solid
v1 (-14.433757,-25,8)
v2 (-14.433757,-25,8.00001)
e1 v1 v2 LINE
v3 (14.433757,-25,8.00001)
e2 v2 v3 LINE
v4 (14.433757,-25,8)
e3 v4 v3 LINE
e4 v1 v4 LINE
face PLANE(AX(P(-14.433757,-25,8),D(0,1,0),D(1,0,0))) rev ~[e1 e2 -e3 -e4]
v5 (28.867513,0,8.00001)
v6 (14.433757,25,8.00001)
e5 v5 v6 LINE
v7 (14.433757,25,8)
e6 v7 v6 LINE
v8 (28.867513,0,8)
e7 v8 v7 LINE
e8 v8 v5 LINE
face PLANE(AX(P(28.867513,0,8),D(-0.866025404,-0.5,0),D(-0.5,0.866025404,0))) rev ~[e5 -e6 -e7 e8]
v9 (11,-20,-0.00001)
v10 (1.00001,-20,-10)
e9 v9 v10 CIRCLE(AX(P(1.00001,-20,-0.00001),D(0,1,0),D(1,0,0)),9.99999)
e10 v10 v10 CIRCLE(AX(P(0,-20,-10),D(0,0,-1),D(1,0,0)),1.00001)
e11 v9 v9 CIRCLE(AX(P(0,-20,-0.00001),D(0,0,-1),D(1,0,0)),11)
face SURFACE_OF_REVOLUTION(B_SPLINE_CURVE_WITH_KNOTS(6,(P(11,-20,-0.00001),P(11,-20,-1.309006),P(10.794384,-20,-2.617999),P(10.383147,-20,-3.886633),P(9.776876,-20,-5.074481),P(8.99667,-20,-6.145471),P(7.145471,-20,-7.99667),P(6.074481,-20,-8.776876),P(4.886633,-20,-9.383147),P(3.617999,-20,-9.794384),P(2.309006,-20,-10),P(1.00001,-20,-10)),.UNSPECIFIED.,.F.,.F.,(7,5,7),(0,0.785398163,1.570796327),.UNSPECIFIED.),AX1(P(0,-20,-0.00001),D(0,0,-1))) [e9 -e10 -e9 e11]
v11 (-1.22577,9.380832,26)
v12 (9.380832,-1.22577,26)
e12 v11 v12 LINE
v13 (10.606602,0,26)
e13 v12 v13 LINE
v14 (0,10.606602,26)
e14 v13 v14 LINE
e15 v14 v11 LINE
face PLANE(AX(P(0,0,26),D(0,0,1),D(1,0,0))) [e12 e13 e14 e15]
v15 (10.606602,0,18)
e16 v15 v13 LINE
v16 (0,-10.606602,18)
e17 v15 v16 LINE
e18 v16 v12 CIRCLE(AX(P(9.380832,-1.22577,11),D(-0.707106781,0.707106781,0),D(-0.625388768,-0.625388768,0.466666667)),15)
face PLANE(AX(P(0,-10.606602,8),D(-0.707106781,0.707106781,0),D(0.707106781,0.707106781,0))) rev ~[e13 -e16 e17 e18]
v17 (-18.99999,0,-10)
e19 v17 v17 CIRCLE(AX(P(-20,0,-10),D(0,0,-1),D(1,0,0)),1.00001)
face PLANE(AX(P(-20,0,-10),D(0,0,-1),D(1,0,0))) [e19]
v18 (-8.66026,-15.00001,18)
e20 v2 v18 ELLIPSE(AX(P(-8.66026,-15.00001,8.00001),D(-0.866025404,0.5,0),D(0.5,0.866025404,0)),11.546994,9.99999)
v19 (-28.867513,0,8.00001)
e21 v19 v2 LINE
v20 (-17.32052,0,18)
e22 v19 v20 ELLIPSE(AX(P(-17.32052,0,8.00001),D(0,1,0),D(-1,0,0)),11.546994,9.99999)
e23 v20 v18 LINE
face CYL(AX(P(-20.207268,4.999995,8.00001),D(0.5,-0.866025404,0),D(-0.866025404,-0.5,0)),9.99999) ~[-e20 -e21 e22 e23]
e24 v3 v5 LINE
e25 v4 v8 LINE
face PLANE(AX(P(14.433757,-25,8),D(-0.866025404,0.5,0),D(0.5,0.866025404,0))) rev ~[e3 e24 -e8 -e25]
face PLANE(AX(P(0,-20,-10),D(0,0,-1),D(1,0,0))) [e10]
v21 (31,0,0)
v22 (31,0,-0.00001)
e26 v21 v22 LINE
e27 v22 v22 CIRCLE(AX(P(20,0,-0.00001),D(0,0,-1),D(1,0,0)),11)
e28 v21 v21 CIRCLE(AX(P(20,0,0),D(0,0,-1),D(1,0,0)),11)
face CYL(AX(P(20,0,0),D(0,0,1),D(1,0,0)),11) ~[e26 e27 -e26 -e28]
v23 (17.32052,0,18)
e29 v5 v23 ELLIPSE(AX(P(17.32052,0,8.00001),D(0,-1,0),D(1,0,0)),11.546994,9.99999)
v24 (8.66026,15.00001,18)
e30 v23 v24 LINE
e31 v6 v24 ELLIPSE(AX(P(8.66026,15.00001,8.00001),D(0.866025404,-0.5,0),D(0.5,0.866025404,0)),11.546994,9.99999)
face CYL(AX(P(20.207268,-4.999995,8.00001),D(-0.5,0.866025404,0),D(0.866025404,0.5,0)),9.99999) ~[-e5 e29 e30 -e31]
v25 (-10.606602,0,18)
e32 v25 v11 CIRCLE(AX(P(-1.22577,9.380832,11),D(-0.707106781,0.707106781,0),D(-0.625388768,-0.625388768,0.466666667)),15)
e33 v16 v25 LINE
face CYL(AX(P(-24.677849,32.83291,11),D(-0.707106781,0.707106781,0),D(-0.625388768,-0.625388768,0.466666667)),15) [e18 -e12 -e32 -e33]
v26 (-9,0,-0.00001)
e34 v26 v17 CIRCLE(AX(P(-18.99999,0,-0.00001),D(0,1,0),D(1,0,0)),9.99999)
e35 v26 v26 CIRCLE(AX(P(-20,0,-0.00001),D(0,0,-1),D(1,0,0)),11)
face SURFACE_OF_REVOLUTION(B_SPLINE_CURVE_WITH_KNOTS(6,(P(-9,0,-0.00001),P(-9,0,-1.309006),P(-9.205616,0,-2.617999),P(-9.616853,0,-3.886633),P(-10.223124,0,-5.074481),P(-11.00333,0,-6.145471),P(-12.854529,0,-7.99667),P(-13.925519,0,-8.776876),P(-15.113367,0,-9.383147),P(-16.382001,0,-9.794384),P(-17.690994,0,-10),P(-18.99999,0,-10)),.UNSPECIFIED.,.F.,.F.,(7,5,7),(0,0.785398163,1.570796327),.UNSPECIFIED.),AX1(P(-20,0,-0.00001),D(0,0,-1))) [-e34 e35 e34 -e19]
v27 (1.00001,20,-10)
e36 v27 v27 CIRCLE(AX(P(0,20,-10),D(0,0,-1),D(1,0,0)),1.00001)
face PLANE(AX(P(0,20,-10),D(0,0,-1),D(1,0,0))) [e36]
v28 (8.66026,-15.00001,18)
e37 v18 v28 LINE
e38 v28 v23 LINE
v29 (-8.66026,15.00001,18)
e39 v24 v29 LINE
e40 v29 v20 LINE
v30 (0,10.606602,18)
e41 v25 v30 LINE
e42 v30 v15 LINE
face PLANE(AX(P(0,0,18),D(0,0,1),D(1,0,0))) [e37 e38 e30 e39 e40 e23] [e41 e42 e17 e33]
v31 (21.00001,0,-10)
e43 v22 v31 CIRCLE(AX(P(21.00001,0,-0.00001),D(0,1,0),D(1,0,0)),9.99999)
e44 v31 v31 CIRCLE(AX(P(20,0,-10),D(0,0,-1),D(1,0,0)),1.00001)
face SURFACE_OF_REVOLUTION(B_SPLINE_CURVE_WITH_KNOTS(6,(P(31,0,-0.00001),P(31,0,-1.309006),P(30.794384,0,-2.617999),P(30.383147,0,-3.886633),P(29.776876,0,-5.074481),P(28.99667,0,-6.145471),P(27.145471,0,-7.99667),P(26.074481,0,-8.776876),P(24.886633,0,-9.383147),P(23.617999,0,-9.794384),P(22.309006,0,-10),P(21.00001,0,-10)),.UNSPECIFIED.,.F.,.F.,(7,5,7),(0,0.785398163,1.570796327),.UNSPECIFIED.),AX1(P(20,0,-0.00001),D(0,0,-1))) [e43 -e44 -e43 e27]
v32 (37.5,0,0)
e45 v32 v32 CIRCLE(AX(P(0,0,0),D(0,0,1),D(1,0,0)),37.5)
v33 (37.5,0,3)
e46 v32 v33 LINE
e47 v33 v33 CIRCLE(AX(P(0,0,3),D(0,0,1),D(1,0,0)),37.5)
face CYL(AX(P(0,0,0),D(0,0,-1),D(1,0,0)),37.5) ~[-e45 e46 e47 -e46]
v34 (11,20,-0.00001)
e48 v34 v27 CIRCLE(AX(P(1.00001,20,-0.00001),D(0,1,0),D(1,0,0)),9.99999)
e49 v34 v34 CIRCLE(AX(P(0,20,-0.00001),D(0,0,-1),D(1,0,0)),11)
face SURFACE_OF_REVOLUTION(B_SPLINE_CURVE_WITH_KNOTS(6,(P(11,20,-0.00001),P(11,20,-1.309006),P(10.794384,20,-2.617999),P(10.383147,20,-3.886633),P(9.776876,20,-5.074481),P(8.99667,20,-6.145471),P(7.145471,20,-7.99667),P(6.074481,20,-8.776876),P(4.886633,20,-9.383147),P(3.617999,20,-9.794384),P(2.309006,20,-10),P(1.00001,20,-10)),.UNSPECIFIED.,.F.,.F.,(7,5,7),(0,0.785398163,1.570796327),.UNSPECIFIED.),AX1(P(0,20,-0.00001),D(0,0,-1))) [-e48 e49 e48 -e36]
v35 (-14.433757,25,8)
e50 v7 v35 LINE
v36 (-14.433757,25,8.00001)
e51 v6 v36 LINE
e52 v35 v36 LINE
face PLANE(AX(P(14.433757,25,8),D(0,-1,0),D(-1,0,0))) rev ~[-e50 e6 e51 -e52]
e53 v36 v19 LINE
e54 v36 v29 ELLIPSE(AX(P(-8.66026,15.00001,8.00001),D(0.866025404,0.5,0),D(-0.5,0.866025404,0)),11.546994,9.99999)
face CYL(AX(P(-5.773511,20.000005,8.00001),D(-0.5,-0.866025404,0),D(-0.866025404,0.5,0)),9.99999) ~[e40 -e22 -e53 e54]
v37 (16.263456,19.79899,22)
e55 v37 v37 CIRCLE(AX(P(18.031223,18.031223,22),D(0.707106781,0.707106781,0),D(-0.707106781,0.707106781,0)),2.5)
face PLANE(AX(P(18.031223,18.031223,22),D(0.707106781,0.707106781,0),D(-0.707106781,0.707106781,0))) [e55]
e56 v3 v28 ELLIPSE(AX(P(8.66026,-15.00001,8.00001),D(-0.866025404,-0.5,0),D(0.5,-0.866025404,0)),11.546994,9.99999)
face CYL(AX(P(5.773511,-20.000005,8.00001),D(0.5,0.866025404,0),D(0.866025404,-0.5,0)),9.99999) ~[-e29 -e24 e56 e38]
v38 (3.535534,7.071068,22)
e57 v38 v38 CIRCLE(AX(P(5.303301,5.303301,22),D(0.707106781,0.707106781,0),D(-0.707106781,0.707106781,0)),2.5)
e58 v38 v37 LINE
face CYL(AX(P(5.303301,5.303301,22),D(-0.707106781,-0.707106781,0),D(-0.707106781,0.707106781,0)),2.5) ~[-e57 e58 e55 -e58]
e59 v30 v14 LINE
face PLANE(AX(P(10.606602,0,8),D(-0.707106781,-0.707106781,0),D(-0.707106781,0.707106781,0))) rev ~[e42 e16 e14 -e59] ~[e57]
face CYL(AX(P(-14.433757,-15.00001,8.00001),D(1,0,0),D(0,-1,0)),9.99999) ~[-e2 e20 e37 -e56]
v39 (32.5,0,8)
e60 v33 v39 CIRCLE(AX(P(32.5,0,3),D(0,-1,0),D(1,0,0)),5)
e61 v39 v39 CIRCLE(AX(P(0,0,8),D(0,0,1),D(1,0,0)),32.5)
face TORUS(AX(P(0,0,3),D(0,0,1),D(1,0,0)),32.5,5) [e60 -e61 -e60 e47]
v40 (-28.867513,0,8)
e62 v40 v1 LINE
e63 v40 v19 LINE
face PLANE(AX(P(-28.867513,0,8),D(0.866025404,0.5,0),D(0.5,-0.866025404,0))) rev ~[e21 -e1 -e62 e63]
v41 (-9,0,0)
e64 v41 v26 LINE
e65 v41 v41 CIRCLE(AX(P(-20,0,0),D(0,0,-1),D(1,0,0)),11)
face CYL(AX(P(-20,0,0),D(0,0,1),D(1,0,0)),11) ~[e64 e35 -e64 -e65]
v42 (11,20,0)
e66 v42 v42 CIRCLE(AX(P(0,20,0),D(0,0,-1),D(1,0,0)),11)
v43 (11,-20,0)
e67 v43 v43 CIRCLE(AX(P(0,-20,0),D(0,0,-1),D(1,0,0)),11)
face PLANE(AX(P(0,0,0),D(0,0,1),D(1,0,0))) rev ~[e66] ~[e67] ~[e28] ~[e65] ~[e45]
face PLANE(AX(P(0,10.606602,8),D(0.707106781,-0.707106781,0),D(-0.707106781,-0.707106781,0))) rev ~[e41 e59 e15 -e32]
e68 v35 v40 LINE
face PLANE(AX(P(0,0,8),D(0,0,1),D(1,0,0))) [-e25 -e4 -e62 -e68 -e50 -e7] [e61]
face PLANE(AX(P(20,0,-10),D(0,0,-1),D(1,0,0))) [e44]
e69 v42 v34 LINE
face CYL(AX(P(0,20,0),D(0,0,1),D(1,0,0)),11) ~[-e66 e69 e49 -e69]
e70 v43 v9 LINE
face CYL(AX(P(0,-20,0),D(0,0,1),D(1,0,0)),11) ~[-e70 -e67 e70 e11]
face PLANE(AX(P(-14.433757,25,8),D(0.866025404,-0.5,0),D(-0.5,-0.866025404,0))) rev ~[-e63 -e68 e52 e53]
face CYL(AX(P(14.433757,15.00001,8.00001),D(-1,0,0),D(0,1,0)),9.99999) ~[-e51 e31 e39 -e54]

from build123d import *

# Parameters (mm, degrees)
F0_R         = 37.5
F1_DEPTH     = 8
F2_R         = 5
F3_R         = 11
F4_DEPTH     = 10
F5_R         = 9.99999
F7_DEPTH     = 10
F8_R         = 9.99999
F10_DEPTH    = 18
F11_T1_DEPTH = 81.3324958071
F12_R        = 2.5
F13_DEPTH    = 18


# Not quite as in the source:
# - a fillet or chamfer that OpenCascade refuses, or shapes differently, is made with other operations: its cross-section is extruded or revolved along the edge and cut away or added
# - a fillet or chamfer is up to 0.001 mm smaller than in the source, because OpenCascade refuses the exact size


with BuildPart() as f1:
    # F0 (on Top) → F1 (new body)
    with BuildSketch(Plane.XY):
        Circle(F0_R)
    extrude(amount=F1_DEPTH)

    # F2
    f2_edges = [f1.edges().sort_by_distance(p)[0] for p in [
        (-37.5, 0, 8),
    ]]
    fillet(f2_edges, radius=F2_R)

    # F3 (on face) → F4 (join)
    with BuildSketch(Plane(origin=(0, 0, 0), x_dir=(1, 0, 0), z_dir=(0, 0, -1))):
        with Locations((20, 0)):
            Circle(F3_R)
        with Locations((-20, 0)):
            Circle(F3_R)
        with Locations((0, 20)):
            Circle(F3_R)
        with Locations((0, -20)):
            Circle(F3_R)
    extrude(amount=F4_DEPTH)

    # F5 (radius 10 in the source; OpenCascade refuses exactly that, so slightly less here)
    f5_edges = [f1.edges().sort_by_distance(p)[0] for p in [
        (-11, 20, -10),
        (-31, 0, -10),
        (-11, -20, -10),
        (9, 0, -10),
    ]]
    fillet(f5_edges, radius=F5_R)

    # F6 (on face) → F7 (join)
    with BuildSketch(Plane.XY.offset(8)):
        Polygon((14.4337567297, -25), (28.8675134595, 0), (14.4337567297, 25), (-14.4337567297, 25), (-28.8675134595, 0), (-14.4337567297, -25), align=None)
    extrude(amount=F7_DEPTH)

    # F8 (radius 10 in the source; OpenCascade refuses exactly that, so slightly less here)
    f8_edges = [f1.edges().sort_by_distance(p)[0] for p in [
        (0, -25, 18),
        (21.650635, -12.5, 18),
        (21.650635, 12.5, 18),
        (0, 25, 18),
        (-21.650635, 12.5, 18),
        (-21.650635, -12.5, 18),
    ]]
    fillet(f8_edges, radius=F8_R)

    # F9 (on face) → F10 (join)
    with BuildSketch(Plane.XY.offset(8)):
        Polygon((10.6066017178, 0), (0, 10.6066017178), (-10.6066017178, 0), (0, -10.6066017178), align=None)
    extrude(amount=F10_DEPTH)

    # F11: fillet of radius 15 on 1 edges, made by hand

    # F11_s2 → F11_t1 (cut)
    with BuildSketch(Plane(origin=(-28.755379658, 28.755379658, 0), x_dir=(0, 0, 1), z_dir=(0.7071067812, -0.7071067812, 0))):
        with BuildLine():
            ThreePointArc((18, 7.5), (23.8452325787, 1.979467531), (26, -5.7664991614))
            Line((26, -5.7664991614), (26, 7.5))
            Line((26, 7.5), (18, 7.5))
        make_face()
    extrude(amount=F11_T1_DEPTH, mode=Mode.SUBTRACT)

    # F12 (on face) → F13 (join)
    with BuildSketch(Plane(origin=(5.3033008589, 5.3033008589, 0), x_dir=(-0.7071067812, 0.7071067812, 0), z_dir=(0.7071067812, 0.7071067812, 0))):
        with Locations((0, 22)):
            Circle(F12_R)
    extrude(amount=F13_DEPTH)


solid = f1.part
